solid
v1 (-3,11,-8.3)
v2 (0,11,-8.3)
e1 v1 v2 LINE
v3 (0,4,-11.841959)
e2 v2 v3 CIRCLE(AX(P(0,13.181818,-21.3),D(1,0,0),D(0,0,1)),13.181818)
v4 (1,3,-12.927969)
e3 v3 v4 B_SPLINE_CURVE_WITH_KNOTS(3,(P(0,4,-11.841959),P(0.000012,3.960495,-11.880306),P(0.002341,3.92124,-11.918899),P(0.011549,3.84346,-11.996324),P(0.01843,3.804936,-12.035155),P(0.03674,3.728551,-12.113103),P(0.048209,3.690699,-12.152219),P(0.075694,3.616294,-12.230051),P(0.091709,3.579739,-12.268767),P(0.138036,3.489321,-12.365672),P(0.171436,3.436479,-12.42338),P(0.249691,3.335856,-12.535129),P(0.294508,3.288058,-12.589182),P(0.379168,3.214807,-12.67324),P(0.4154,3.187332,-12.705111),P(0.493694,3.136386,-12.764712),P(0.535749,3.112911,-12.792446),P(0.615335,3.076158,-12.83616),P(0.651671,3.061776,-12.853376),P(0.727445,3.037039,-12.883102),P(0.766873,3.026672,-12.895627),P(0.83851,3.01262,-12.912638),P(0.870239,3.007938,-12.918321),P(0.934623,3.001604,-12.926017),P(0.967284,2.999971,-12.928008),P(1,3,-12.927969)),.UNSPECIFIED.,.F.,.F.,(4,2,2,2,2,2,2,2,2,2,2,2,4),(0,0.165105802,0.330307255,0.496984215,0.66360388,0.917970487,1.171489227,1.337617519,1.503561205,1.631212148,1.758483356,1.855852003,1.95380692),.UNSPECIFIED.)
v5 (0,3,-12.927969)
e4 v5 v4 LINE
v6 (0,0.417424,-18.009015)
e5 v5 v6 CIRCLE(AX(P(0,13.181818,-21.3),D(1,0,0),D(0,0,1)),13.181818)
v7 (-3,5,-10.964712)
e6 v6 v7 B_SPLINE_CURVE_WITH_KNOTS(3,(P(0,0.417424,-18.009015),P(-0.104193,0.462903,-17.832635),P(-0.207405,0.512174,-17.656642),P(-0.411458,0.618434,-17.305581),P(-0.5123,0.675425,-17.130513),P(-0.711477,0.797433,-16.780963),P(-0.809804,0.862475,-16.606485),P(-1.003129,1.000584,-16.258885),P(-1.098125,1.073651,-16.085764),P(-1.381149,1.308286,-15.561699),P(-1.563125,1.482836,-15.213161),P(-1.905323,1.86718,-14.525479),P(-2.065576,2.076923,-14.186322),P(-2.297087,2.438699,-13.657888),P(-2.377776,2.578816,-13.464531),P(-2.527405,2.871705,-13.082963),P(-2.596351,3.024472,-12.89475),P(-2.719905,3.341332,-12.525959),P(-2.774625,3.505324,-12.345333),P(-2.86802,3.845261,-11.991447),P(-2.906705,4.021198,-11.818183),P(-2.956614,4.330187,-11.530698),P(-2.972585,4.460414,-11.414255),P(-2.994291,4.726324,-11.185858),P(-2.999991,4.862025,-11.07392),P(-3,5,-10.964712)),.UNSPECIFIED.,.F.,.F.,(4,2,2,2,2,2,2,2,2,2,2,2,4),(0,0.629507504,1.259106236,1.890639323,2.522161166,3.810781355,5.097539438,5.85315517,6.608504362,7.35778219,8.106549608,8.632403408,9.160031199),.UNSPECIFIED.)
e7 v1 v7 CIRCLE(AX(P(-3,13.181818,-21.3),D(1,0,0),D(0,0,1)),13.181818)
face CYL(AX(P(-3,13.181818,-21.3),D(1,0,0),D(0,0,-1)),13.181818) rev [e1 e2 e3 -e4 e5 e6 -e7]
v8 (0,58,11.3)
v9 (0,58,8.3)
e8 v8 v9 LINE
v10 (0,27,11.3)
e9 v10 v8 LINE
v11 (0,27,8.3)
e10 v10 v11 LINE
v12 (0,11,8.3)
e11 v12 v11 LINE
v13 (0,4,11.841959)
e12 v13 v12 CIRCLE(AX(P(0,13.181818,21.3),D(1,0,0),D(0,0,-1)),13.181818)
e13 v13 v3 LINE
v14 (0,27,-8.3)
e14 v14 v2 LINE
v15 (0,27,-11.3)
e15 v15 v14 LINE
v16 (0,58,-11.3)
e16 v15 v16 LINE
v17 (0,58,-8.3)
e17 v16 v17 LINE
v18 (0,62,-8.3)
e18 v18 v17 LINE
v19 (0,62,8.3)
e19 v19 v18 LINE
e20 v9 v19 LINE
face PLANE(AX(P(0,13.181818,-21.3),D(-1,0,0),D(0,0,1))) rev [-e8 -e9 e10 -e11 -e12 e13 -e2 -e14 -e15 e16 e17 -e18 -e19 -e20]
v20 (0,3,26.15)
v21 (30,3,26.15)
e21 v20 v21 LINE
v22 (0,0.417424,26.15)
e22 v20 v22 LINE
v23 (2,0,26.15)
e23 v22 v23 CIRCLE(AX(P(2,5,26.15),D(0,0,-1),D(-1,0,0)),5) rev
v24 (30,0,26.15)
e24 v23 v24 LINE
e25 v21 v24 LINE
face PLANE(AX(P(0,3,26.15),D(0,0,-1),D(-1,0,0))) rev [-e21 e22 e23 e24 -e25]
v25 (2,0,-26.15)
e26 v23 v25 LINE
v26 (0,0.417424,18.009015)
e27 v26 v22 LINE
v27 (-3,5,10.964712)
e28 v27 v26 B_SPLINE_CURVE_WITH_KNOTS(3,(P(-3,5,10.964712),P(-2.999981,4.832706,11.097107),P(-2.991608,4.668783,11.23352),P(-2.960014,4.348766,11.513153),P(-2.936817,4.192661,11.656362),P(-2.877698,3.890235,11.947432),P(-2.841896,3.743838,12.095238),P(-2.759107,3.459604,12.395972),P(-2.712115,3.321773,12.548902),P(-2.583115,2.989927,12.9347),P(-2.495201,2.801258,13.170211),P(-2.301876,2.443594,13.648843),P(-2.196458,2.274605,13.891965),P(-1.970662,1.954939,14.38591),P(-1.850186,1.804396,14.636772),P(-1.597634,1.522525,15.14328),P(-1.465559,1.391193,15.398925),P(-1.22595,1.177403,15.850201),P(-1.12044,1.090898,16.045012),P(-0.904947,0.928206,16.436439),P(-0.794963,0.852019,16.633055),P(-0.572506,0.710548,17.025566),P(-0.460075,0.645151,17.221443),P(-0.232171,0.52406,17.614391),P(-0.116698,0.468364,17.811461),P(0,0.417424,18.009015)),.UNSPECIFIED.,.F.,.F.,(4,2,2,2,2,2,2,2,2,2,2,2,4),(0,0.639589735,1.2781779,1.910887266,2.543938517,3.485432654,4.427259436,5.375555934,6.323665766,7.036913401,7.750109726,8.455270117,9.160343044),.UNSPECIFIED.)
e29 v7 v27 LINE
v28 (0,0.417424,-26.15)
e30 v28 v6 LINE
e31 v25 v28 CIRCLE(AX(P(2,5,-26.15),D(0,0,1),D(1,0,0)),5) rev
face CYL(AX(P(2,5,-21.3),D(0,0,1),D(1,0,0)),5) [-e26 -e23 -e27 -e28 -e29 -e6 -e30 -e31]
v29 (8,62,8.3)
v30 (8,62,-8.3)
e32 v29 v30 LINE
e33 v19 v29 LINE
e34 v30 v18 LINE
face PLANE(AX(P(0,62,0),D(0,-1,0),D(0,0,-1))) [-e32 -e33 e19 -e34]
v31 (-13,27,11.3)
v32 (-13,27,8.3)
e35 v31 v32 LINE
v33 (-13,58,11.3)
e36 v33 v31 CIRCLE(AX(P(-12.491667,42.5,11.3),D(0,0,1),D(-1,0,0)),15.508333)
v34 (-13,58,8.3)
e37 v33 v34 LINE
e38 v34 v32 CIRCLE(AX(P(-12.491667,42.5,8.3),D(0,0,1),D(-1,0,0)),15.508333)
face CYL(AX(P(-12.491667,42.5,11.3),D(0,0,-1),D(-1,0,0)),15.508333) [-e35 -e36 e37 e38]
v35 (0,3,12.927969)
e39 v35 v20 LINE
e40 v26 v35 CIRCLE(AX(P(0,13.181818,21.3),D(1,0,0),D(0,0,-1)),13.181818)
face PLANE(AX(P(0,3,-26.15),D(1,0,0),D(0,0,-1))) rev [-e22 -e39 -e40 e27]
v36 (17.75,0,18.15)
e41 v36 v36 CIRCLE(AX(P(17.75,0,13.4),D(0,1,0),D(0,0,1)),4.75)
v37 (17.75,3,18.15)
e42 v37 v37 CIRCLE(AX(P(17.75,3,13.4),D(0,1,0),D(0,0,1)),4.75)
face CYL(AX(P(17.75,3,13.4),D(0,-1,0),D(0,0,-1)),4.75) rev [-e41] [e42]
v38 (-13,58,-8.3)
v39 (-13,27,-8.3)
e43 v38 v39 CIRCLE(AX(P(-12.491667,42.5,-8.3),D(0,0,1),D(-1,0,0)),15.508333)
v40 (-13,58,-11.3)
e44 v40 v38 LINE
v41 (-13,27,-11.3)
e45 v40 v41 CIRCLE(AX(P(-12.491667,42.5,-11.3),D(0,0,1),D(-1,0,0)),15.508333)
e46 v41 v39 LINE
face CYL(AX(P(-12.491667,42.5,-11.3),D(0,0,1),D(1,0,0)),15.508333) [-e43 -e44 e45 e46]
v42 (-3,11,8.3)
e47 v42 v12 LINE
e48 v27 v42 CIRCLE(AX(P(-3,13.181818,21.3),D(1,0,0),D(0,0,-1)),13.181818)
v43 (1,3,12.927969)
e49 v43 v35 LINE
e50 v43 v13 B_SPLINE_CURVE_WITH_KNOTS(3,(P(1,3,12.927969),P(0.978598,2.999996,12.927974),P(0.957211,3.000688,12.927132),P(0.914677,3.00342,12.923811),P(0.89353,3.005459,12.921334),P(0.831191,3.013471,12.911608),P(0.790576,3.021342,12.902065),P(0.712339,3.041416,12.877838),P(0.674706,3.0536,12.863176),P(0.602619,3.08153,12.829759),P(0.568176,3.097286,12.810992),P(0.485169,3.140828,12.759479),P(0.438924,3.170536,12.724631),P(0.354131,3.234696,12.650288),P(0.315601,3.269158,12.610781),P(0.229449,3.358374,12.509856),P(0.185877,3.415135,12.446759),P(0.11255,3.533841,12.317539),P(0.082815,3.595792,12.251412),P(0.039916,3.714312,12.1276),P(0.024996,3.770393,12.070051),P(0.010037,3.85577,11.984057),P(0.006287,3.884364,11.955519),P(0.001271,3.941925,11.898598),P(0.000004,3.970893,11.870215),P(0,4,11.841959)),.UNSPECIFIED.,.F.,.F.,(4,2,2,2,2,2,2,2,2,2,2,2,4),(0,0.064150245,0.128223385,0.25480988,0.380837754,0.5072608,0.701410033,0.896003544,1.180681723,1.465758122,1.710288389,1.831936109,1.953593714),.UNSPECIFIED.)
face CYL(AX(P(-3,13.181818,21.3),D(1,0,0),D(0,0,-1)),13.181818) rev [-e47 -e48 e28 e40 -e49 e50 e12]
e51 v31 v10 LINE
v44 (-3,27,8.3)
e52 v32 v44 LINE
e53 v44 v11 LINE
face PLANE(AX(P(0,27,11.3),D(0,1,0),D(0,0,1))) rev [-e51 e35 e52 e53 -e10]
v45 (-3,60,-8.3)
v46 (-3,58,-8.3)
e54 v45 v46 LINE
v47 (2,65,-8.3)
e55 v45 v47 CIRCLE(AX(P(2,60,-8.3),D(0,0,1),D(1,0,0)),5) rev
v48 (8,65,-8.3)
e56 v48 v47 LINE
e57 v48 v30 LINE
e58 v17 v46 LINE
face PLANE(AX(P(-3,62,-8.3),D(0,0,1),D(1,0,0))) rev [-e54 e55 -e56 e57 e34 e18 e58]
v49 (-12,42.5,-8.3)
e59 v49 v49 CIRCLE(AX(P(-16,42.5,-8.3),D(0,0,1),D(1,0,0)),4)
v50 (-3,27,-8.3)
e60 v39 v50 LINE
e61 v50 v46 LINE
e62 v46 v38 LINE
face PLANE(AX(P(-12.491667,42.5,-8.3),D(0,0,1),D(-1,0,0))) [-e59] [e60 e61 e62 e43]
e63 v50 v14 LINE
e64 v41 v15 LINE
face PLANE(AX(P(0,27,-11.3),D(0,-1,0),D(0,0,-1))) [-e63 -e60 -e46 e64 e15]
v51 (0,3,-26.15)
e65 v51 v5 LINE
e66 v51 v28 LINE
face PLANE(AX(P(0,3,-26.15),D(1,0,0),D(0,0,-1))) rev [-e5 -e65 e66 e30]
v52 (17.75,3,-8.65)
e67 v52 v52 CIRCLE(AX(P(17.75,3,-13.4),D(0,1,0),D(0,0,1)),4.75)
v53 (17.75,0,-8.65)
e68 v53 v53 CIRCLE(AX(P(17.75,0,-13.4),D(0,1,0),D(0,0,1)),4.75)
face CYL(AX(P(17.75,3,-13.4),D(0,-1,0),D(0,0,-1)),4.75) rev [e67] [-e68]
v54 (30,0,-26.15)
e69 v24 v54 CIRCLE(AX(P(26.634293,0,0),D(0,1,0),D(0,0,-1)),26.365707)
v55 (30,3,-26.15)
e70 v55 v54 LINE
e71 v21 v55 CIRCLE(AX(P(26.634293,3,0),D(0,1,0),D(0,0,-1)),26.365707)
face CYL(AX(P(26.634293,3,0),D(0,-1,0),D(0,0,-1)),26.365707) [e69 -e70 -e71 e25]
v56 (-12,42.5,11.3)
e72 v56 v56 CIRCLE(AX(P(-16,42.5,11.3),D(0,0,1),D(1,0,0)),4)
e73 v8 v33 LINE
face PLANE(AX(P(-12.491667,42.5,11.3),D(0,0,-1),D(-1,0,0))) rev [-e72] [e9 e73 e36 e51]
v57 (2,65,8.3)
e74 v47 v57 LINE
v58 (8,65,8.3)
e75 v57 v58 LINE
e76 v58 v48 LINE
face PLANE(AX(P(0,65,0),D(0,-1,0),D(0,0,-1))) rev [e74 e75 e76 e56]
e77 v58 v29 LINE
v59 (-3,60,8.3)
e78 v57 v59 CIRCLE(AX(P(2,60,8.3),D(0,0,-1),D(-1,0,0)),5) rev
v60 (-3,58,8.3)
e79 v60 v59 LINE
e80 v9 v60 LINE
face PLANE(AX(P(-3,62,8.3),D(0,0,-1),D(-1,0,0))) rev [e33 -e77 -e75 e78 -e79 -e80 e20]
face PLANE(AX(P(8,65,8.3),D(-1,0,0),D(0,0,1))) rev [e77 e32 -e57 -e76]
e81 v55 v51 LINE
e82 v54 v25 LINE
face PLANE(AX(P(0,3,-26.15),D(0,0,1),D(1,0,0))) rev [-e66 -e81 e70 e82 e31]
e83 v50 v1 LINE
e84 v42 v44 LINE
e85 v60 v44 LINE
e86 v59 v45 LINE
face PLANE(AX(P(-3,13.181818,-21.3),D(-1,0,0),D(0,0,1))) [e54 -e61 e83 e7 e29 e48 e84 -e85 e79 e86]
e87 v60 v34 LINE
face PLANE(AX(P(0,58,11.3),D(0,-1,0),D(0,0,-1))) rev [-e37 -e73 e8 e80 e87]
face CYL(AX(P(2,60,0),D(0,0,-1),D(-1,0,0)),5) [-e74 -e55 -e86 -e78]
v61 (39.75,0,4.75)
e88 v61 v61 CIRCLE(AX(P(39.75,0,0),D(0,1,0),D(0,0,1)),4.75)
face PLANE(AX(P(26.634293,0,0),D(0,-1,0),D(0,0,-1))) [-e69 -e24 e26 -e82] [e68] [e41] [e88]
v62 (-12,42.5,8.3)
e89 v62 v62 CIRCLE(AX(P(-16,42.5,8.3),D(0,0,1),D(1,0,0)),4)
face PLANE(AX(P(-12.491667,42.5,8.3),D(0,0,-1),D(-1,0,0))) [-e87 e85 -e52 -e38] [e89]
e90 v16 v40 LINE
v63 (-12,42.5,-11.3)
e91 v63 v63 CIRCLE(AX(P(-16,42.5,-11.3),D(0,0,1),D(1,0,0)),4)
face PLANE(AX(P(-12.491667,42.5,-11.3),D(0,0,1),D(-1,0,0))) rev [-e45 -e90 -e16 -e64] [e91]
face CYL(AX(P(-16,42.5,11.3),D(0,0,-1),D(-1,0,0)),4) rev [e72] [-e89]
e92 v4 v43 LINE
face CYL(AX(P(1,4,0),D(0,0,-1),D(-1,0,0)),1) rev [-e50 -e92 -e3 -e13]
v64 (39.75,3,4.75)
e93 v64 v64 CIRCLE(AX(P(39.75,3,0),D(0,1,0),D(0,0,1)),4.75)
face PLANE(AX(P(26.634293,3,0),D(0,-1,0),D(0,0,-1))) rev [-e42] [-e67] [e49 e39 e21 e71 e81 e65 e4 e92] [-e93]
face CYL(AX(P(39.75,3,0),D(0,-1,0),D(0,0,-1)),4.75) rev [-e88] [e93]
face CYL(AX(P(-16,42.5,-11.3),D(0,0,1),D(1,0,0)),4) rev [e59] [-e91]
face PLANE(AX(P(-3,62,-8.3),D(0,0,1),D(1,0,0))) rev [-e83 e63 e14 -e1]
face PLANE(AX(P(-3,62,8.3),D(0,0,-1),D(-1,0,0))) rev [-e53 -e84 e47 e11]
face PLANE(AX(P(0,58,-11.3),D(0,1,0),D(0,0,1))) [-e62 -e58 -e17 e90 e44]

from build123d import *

# Parameters (mm, degrees)
SKETCH1_R           = 4.75
BOSS_EXTRUDE1_DEPTH = 3
BOSS_EXTRUDE3_DEPTH = 3
SKETCH4_W           = 11
SKETCH4_H           = 16.6
BOSS_EXTRUDE4_DEPTH = 3
SKETCH5_R           = 4
BOSS_EXTRUDE5_DEPTH = 3
FILLET6_R           = 5
FILLET7_R           = 1


with BuildPart() as part:
    # Sketch1 → Boss-Extrude1 (new body)
    with BuildSketch(Plane(origin=(0, 0, 0), x_dir=(1, 0, 0), z_dir=(0, 1, 0))):
        with BuildLine():
            Line((0, 26.15), (30, 26.15))
            ThreePointArc((30, 26.15), (53, 0), (30, -26.15))
            Line((30, -26.15), (0, -26.15))
            Line((0, -26.15), (0, 26.15))
        make_face()
        with Locations(Location((17.75, 13.4, 0), (0, 0, 270))):
            Circle(SKETCH1_R, mode=Mode.SUBTRACT)
        with Locations(Location((17.75, -13.4, 0), (0, 0, 270))):
            Circle(SKETCH1_R, mode=Mode.SUBTRACT)
        with Locations(Location((39.75, 0, 0), (0, 0, 270))):
            Circle(SKETCH1_R, mode=Mode.SUBTRACT)
    extrude(amount=BOSS_EXTRUDE1_DEPTH)

    # Sketch3 → Boss-Extrude3 (add)
    with BuildSketch(Plane.ZY):
        with BuildLine():
            Line((-8.3, 0), (8.3, 0))
            Line((8.3, 0), (21.3, 0))
            ThreePointArc((21.3, 0), (12.785306817, 3.118998966), (8.3, 11))
            Line((8.3, 11), (8.3, 62))
            Line((8.3, 62), (-8.3, 62))
            Line((-8.3, 62), (-8.3, 11))
            ThreePointArc((-8.3, 11), (-12.785306817, 3.118998966), (-21.3, 0))
            Line((-21.3, 0), (-8.3, 0))
        make_face()
    extrude(amount=BOSS_EXTRUDE3_DEPTH)

    # Sketch4 → Boss-Extrude4 (add)
    with BuildSketch(Plane(origin=(0, 62, 0), x_dir=(1, 0, 0), z_dir=(0, 1, 0))):
        with Locations((2.5, 0)):
            Rectangle(SKETCH4_W, SKETCH4_H)
    extrude(amount=BOSS_EXTRUDE4_DEPTH)

    # Sketch5 → Boss-Extrude5 (add)
    with BuildSketch(Plane.XY.offset(8.3)):
        with BuildLine():
            Line((0, 58), (0, 27))
            Line((0, 27), (-13, 27))
            ThreePointArc((-13, 27), (-28, 42.5), (-13, 58))
            Line((-13, 58), (0, 58))
        make_face()
        with Locations((-16, 42.5)):
            Circle(SKETCH5_R, mode=Mode.SUBTRACT)
    boss_extrude5 = extrude(amount=BOSS_EXTRUDE5_DEPTH)

    # Mirror1: Boss-Extrude5 across plane
    add(boss_extrude5.mirror(Plane.XY))

    # Fillet6
    # the kernel refuses this fillet: 5 mm, written as the material it takes off along each edge
    with BuildSketch(Plane(origin=(-3, 65, -20.8), x_dir=(0, -1, 0), z_dir=(0, 0, 1))) as fillet6_piece_1:
        with BuildLine():
            CenterArc((FILLET6_R, FILLET6_R), FILLET6_R, 180, 90)
            Line((0, FILLET6_R), (0, 0))
            Line((0, 0), (FILLET6_R, 0))
        make_face()
    extrude(amount=41.6, mode=Mode.SUBTRACT)
    with BuildSketch(Plane(origin=(-3, 0, 33.8), x_dir=(1, 0, 0), z_dir=(0, 0, -1))) as fillet6_piece_2:
        with BuildLine():
            CenterArc((FILLET6_R, -FILLET6_R), FILLET6_R, 90, 90)
            Line((0, -FILLET6_R), (0, 0))
            Line((0, 0), (FILLET6_R, 0))
        make_face()
    extrude(amount=67.6, mode=Mode.SUBTRACT)

    # Fillet7
    fillet7_edges = [part.edges().sort_by_distance(p)[0] for p in [
        (0, 3, 0),
    ]]
    fillet(fillet7_edges, radius=FILLET7_R)


solid = part.part
